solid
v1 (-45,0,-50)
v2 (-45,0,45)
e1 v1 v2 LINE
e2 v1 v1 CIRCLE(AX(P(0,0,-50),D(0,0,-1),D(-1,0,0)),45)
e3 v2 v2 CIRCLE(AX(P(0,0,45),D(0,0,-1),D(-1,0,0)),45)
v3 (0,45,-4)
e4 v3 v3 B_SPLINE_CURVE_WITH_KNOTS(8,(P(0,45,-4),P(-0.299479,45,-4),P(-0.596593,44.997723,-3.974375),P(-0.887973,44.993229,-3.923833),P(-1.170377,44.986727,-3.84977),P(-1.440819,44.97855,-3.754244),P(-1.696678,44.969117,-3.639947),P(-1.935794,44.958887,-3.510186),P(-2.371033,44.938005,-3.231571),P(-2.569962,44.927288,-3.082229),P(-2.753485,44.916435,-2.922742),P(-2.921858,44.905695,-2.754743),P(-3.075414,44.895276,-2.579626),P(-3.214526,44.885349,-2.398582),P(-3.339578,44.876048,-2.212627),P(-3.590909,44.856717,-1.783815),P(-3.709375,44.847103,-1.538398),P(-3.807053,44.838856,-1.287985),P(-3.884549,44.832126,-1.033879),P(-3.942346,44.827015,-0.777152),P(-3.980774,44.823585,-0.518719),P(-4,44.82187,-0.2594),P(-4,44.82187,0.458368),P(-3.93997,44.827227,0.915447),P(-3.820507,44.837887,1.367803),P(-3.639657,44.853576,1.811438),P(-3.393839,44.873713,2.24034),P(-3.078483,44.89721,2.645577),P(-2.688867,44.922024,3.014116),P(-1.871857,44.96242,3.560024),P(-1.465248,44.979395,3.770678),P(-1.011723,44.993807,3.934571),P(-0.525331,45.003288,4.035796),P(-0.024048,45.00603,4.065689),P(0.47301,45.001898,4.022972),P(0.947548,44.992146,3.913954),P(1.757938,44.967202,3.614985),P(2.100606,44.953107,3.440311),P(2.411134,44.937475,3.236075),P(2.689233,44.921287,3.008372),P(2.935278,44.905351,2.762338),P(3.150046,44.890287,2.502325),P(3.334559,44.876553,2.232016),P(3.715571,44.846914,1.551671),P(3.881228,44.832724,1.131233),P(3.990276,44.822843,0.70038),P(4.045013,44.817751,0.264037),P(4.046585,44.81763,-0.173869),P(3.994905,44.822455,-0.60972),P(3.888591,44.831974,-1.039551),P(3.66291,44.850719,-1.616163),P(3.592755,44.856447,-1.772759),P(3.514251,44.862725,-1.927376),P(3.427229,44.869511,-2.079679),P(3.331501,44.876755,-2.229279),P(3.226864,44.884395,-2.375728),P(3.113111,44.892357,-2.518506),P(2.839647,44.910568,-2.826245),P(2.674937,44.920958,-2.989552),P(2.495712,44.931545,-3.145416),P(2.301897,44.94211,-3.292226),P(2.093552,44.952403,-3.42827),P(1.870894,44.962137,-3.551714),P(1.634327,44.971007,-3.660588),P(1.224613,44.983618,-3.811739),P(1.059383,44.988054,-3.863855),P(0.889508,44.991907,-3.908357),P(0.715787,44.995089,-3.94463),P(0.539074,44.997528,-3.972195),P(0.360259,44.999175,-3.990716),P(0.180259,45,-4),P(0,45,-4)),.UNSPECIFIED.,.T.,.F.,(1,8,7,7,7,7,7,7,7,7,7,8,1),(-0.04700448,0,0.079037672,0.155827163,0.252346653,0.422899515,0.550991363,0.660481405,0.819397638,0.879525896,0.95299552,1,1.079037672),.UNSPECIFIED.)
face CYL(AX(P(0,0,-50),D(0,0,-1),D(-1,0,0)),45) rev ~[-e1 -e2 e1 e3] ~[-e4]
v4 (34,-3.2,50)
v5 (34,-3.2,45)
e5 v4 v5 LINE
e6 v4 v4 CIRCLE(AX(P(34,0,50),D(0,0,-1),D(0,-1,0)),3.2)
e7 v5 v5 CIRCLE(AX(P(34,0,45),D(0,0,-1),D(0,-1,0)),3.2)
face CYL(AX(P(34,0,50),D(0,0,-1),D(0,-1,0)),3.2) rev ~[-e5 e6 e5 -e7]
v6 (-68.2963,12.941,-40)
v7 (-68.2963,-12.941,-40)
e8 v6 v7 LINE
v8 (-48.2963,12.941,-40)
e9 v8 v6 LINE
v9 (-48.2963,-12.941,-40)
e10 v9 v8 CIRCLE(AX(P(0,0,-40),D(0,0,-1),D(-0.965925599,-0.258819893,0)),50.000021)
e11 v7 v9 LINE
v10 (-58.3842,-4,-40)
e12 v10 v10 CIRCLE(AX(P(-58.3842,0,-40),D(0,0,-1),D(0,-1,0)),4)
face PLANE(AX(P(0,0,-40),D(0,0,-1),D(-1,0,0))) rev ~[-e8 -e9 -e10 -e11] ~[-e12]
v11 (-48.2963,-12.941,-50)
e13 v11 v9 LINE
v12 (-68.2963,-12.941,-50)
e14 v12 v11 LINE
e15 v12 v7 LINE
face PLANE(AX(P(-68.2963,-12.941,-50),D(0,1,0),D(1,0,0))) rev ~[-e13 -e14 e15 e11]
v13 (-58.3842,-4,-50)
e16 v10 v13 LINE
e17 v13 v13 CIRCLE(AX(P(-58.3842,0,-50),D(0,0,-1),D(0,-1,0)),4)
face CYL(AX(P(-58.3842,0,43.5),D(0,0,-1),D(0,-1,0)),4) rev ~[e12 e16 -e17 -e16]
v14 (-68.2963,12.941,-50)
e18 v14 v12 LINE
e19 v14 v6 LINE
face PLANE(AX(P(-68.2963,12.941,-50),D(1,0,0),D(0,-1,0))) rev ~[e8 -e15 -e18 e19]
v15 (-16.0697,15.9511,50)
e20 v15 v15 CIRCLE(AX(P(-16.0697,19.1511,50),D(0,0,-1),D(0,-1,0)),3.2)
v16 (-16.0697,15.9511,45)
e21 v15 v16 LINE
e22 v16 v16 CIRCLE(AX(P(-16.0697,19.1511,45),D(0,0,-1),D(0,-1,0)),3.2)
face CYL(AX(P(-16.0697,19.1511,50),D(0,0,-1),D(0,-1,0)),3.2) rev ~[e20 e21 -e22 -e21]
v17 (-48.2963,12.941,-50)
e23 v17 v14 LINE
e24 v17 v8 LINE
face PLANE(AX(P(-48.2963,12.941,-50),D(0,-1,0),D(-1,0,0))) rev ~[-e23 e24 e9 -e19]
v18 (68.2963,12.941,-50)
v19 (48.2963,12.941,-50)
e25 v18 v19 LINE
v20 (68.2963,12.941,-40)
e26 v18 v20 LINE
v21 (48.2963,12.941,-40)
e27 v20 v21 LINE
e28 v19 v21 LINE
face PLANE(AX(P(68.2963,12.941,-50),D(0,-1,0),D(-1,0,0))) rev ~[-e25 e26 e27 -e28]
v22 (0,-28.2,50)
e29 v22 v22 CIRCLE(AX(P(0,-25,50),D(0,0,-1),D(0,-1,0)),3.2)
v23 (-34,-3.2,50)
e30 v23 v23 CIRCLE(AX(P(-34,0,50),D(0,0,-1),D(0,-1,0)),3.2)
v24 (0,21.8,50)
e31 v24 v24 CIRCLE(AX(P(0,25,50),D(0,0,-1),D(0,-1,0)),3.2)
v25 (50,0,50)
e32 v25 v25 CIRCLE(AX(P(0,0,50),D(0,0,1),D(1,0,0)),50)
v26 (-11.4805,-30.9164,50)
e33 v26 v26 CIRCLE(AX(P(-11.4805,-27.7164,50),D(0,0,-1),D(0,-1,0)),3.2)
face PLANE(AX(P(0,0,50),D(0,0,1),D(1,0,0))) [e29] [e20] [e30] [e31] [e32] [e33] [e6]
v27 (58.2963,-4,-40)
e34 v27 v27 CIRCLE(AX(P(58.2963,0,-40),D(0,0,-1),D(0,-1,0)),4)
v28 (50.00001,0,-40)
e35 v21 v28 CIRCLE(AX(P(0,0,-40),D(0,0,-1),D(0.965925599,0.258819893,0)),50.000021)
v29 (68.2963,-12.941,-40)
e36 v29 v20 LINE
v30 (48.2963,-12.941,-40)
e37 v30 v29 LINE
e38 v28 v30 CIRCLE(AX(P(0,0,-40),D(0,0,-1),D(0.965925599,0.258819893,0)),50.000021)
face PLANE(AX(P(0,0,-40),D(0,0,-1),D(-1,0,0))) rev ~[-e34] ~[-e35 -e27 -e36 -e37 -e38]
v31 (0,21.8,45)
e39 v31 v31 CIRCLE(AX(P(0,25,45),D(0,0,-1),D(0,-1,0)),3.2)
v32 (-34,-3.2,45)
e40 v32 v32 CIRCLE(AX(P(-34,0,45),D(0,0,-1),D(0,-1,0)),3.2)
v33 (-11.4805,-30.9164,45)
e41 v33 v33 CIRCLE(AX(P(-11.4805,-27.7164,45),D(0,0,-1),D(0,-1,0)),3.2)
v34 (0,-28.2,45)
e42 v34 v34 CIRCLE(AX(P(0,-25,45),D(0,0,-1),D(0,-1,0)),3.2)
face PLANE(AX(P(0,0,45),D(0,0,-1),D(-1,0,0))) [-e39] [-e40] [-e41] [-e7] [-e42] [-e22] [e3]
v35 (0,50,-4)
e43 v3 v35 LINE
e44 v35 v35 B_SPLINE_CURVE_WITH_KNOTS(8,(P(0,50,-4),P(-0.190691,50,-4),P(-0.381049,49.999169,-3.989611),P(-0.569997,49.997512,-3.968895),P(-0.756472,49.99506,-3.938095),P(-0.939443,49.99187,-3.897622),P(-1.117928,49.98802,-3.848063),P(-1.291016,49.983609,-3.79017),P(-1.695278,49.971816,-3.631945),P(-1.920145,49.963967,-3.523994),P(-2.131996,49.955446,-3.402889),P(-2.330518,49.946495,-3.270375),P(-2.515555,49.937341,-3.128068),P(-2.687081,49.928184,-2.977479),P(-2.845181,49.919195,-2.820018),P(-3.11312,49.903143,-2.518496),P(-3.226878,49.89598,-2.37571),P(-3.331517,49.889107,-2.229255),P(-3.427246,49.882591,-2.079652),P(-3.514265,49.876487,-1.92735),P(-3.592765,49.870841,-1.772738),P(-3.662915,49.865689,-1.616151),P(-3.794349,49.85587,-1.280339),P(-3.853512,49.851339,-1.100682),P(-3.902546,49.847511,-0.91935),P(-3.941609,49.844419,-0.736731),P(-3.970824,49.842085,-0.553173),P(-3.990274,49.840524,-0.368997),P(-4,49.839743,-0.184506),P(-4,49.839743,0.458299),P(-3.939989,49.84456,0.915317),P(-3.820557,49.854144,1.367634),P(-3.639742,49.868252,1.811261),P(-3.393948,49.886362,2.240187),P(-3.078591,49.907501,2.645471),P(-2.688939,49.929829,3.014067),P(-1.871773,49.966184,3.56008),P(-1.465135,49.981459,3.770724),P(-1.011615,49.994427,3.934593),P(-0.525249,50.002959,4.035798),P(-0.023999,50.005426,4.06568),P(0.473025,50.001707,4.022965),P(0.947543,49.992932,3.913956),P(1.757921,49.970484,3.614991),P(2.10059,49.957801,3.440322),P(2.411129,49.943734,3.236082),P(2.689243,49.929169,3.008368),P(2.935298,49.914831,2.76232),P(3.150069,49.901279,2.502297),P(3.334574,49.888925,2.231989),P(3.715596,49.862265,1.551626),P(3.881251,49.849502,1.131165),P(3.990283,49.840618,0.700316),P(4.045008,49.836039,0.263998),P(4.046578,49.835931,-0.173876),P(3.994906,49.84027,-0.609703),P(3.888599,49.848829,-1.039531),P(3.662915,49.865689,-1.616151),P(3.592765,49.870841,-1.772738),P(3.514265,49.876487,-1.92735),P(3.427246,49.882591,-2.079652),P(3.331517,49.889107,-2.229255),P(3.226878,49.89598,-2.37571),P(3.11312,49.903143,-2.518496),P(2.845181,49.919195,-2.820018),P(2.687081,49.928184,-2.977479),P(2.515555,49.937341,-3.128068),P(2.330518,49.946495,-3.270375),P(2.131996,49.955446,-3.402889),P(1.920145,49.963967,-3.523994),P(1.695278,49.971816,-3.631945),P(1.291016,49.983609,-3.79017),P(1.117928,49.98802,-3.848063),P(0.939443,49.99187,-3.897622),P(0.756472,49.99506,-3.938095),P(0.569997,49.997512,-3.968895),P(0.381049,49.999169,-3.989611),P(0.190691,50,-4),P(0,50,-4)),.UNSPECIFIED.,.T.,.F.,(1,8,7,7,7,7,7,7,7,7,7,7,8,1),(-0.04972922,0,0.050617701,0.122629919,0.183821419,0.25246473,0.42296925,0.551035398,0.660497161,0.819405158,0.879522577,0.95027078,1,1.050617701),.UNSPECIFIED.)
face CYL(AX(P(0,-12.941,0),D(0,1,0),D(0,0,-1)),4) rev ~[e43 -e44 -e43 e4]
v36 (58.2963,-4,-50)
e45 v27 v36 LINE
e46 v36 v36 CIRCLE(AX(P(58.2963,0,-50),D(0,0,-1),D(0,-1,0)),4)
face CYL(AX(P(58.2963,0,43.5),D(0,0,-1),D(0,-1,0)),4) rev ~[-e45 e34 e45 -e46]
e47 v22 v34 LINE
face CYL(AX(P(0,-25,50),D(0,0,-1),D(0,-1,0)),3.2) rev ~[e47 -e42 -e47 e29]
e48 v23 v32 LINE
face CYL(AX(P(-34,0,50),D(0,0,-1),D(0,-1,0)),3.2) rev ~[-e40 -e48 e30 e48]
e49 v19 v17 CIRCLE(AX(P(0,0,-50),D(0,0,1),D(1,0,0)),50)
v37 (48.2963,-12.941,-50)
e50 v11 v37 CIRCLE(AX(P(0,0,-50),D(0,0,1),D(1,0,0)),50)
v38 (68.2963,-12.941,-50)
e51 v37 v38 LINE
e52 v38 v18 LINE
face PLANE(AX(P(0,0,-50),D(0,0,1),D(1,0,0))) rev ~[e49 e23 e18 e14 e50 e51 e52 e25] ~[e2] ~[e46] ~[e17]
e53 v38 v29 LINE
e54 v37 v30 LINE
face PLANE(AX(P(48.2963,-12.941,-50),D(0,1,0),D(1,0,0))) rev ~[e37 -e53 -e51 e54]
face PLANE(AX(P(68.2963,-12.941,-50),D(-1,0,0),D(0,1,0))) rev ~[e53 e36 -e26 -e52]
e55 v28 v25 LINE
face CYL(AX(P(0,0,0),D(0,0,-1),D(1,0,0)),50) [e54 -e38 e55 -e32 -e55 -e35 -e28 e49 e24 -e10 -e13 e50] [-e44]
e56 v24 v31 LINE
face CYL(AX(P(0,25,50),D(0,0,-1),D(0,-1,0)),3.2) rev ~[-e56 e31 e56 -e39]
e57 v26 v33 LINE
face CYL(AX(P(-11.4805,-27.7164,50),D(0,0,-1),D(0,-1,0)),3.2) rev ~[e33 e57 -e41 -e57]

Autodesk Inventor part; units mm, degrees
ref_plane "YZ Plane" through (0, 0, 0) normal (1, 0, 0) x (0, 1, 0)
ref_plane "XZ Plane" through (0, 0, 0) normal (0, 1, 0) x (-1, 0, 0)
ref_plane "XY Plane" through (0, 0, 0) normal (0, 0, 1) x (1, 0, 0)
sketch "Sketch1" plane through (0, 0, 0) normal (0, 0, 1) x (1, 0, 0)
  circle A0 centre (0, 0) radius 50
  dimension "d0" = 100
extrude "Extrusion1" add sketch "Sketch1" along normal mid plane 100
sketch "Sketch2" plane through (0, 0, -50) normal (0, 0, -1) x (-1, 0, 0)
  circle A0 centre (0, 0) radius 45
  dimension "d3" = 90
extrude "Extrusion2" cut sketch "Sketch2" against normal blind 95
sketch "Sketch5" plane through (0, 0, 50) normal (0, 0, 1) x (1, 0, 0)
  point P0 (0, 0)
sketch "Sketch7" plane through (0, 0, 50) normal (0, 0, 1) x (1, 0, 0)
  arc A0 (50, 0) -> (50, 0) centre (0, 0) ccw construction
  circle A1 centre (0, 0) radius 50 construction
sketch "Sketch8" plane through (0, 0, -50) normal (0, 0, -1) x (-1, 0, 0)
  arc A0 (48.2963, -12.941) -> (48.2963, 12.941) centre (0, 0) ccw
  line L0 (0, 0) -> (50, 0) construction
  line L1 (48.2963, 12.941) -> (68.2963, 12.941)
  line L2 (68.2963, 12.941) -> (68.2963, -12.941)
  line L3 (68.2963, -12.941) -> (48.2963, -12.941)
  line L4 (48.2963, 12.941) -> (-48.2963, 12.941) construction
  line L5 (48.2963, -12.941) -> (-48.2963, -12.941) construction
  circle A1 centre (0, 0) radius 50 construction
  arc A2 (-48.2963, 12.941) -> (-48.2963, -12.941) centre (0, 0) ccw
  line L6 (-48.2963, -12.941) -> (-68.2963, -12.941)
  line L7 (-68.2963, -12.941) -> (-68.2963, 12.941)
  line L8 (-68.2963, 12.941) -> (-48.2963, 12.941)
  dimension "d31" = 50
  dimension "d34" = 20
  dimension "d35" = 20
extrude "Extrusion5" add sketch "Sketch8" against normal blind 10
sketch "Sketch9" plane through (0, 0, 50) normal (0, 0, 1) x (1, 0, 0)
  point P0 (0, 0)
sketch "Sketch10" plane through (0, 0, 50) normal (0, 0, 1) x (1, 0, 0)
  line L0 (-68.2963, -12.941) -> (-68.2963, 12.941) construction
  line L1 (-68.2963, -12.941) -> (-48.4721, 12.941) construction
  line L2 (-68.2963, 12.941) -> (-48.4721, -12.941) construction
  line L3 (48.2963, 12.941) -> (68.2963, 12.941) construction
  line L4 (48.2963, -12.941) -> (68.2963, 12.941) construction
  line L5 (68.2963, 12.941) -> (68.2963, -12.941) construction
  arc A0 (48.2963, -12.941) -> (48.2963, 12.941) centre (0, 0) ccw construction
  line L6 (68.2963, -12.941) -> (48.2963, 12.941) construction
  point P0 (-58.3842, 0)
  point P1 (58.2963, 0)
hole "Hole2" at (-58.3842, 0, 50) at (58.2963, 0, 50) direction (0, 0, -1) diameter 8 end through all counterbore diameter 11 counterbore depth 6.5
sketch "Sketch11" plane through (-68.2963, -12.941, -50) normal (0, -1, 0) x (1, 0, 0)
  line L0 (20, 0) -> (116.5926, 0) construction
  line L1 (118.2963, 100) -> (18.2963, 100) construction
  line L2 (20, 0) -> (118.2963, 100) construction
  line L3 (118.2963, 100) -> (18.2963, 100) construction
  line L4 (116.5926, 10) -> (116.5926, 0) construction
  line L5 (18.2963, 100) -> (116.5926, 0) construction
  point P0 (68.2963, 50)
  point P1 (68.2963, 50)
hole "Hole3" at (0, -12.941, 0) direction (0, 1, 0) diameter 8 end through all
sketch "Sketch12" plane through (0, 0, 50) normal (0, 0, 1) x (1, 0, 0)
  circle A0 centre (0, 0) radius 42
  circle A1 centre (0, 0) radius 25
  line L0 (0, 70.0025) -> (0, -70.0004) projected
  line L1 (-95.6148, 0) -> (95.6148, 0) projected
  point P0 (0, 25)
  point P1 (0, -25)
  dimension "d52" = 84
  dimension "d53" = 50
hole "Hole4" at (0, 25, 50) at (0, -25, 50) direction (0, 0, -1) diameter 6.4 end through all
sketch "Sketch13" plane through (0, 0, 50) normal (0, 0, 1) x (1, 0, 0)
  circle A0 centre (0, 0) radius 34
  line L0 (0, 70.0025) -> (0, -70.0004) projected
  line L1 (-95.6148, 0) -> (95.6148, 0) projected
  point P0 (-34, 0)
  point P1 (34, 0)
  dimension "d61" = 68
hole "Hole5" at (-34, 0, 50) at (34, 0, 50) direction (0, 0, -1) diameter 6.4 end through all
sketch "Sketch14" plane through (0, 0, 50) normal (0, 0, 1) x (1, 0, 0)
  circle A0 centre (0, 0) radius 25
  line L0 (0, 0) -> (-11.4805, -27.7164)
  line L1 (0, 70.0025) -> (0, -70.0004) projected
  line L2 (-95.6148, 0) -> (95.6148, 0) projected
  dimension "d69" = 50
  dimension "d70" = 30
hole "Hole6" at (-11.4805, -27.7164, 50) direction (0, 0, -1) diameter 6.4 end through all
sketch "Sketch15" plane through (0, 0, 50) normal (0, 0, 1) x (1, 0, 0)
  circle A0 centre (0, 0) radius 25 construction
  line L0 (0, 0) -> (-16.0697, 19.1511) construction
  line L1 (0, 70.0025) -> (0, -70.0004) construction
  line L2 (-95.6148, 0) -> (95.6148, 0) construction
  dimension "d79" = 50
  dimension "d80" = 40
hole "Hole7" at (-16.0697, 19.1511, 50) at (-16.0697, 19.1511, 50) direction (0, 0, -1) diameter 6.4 end through all
properties part number "Hus_Til_Motor"
